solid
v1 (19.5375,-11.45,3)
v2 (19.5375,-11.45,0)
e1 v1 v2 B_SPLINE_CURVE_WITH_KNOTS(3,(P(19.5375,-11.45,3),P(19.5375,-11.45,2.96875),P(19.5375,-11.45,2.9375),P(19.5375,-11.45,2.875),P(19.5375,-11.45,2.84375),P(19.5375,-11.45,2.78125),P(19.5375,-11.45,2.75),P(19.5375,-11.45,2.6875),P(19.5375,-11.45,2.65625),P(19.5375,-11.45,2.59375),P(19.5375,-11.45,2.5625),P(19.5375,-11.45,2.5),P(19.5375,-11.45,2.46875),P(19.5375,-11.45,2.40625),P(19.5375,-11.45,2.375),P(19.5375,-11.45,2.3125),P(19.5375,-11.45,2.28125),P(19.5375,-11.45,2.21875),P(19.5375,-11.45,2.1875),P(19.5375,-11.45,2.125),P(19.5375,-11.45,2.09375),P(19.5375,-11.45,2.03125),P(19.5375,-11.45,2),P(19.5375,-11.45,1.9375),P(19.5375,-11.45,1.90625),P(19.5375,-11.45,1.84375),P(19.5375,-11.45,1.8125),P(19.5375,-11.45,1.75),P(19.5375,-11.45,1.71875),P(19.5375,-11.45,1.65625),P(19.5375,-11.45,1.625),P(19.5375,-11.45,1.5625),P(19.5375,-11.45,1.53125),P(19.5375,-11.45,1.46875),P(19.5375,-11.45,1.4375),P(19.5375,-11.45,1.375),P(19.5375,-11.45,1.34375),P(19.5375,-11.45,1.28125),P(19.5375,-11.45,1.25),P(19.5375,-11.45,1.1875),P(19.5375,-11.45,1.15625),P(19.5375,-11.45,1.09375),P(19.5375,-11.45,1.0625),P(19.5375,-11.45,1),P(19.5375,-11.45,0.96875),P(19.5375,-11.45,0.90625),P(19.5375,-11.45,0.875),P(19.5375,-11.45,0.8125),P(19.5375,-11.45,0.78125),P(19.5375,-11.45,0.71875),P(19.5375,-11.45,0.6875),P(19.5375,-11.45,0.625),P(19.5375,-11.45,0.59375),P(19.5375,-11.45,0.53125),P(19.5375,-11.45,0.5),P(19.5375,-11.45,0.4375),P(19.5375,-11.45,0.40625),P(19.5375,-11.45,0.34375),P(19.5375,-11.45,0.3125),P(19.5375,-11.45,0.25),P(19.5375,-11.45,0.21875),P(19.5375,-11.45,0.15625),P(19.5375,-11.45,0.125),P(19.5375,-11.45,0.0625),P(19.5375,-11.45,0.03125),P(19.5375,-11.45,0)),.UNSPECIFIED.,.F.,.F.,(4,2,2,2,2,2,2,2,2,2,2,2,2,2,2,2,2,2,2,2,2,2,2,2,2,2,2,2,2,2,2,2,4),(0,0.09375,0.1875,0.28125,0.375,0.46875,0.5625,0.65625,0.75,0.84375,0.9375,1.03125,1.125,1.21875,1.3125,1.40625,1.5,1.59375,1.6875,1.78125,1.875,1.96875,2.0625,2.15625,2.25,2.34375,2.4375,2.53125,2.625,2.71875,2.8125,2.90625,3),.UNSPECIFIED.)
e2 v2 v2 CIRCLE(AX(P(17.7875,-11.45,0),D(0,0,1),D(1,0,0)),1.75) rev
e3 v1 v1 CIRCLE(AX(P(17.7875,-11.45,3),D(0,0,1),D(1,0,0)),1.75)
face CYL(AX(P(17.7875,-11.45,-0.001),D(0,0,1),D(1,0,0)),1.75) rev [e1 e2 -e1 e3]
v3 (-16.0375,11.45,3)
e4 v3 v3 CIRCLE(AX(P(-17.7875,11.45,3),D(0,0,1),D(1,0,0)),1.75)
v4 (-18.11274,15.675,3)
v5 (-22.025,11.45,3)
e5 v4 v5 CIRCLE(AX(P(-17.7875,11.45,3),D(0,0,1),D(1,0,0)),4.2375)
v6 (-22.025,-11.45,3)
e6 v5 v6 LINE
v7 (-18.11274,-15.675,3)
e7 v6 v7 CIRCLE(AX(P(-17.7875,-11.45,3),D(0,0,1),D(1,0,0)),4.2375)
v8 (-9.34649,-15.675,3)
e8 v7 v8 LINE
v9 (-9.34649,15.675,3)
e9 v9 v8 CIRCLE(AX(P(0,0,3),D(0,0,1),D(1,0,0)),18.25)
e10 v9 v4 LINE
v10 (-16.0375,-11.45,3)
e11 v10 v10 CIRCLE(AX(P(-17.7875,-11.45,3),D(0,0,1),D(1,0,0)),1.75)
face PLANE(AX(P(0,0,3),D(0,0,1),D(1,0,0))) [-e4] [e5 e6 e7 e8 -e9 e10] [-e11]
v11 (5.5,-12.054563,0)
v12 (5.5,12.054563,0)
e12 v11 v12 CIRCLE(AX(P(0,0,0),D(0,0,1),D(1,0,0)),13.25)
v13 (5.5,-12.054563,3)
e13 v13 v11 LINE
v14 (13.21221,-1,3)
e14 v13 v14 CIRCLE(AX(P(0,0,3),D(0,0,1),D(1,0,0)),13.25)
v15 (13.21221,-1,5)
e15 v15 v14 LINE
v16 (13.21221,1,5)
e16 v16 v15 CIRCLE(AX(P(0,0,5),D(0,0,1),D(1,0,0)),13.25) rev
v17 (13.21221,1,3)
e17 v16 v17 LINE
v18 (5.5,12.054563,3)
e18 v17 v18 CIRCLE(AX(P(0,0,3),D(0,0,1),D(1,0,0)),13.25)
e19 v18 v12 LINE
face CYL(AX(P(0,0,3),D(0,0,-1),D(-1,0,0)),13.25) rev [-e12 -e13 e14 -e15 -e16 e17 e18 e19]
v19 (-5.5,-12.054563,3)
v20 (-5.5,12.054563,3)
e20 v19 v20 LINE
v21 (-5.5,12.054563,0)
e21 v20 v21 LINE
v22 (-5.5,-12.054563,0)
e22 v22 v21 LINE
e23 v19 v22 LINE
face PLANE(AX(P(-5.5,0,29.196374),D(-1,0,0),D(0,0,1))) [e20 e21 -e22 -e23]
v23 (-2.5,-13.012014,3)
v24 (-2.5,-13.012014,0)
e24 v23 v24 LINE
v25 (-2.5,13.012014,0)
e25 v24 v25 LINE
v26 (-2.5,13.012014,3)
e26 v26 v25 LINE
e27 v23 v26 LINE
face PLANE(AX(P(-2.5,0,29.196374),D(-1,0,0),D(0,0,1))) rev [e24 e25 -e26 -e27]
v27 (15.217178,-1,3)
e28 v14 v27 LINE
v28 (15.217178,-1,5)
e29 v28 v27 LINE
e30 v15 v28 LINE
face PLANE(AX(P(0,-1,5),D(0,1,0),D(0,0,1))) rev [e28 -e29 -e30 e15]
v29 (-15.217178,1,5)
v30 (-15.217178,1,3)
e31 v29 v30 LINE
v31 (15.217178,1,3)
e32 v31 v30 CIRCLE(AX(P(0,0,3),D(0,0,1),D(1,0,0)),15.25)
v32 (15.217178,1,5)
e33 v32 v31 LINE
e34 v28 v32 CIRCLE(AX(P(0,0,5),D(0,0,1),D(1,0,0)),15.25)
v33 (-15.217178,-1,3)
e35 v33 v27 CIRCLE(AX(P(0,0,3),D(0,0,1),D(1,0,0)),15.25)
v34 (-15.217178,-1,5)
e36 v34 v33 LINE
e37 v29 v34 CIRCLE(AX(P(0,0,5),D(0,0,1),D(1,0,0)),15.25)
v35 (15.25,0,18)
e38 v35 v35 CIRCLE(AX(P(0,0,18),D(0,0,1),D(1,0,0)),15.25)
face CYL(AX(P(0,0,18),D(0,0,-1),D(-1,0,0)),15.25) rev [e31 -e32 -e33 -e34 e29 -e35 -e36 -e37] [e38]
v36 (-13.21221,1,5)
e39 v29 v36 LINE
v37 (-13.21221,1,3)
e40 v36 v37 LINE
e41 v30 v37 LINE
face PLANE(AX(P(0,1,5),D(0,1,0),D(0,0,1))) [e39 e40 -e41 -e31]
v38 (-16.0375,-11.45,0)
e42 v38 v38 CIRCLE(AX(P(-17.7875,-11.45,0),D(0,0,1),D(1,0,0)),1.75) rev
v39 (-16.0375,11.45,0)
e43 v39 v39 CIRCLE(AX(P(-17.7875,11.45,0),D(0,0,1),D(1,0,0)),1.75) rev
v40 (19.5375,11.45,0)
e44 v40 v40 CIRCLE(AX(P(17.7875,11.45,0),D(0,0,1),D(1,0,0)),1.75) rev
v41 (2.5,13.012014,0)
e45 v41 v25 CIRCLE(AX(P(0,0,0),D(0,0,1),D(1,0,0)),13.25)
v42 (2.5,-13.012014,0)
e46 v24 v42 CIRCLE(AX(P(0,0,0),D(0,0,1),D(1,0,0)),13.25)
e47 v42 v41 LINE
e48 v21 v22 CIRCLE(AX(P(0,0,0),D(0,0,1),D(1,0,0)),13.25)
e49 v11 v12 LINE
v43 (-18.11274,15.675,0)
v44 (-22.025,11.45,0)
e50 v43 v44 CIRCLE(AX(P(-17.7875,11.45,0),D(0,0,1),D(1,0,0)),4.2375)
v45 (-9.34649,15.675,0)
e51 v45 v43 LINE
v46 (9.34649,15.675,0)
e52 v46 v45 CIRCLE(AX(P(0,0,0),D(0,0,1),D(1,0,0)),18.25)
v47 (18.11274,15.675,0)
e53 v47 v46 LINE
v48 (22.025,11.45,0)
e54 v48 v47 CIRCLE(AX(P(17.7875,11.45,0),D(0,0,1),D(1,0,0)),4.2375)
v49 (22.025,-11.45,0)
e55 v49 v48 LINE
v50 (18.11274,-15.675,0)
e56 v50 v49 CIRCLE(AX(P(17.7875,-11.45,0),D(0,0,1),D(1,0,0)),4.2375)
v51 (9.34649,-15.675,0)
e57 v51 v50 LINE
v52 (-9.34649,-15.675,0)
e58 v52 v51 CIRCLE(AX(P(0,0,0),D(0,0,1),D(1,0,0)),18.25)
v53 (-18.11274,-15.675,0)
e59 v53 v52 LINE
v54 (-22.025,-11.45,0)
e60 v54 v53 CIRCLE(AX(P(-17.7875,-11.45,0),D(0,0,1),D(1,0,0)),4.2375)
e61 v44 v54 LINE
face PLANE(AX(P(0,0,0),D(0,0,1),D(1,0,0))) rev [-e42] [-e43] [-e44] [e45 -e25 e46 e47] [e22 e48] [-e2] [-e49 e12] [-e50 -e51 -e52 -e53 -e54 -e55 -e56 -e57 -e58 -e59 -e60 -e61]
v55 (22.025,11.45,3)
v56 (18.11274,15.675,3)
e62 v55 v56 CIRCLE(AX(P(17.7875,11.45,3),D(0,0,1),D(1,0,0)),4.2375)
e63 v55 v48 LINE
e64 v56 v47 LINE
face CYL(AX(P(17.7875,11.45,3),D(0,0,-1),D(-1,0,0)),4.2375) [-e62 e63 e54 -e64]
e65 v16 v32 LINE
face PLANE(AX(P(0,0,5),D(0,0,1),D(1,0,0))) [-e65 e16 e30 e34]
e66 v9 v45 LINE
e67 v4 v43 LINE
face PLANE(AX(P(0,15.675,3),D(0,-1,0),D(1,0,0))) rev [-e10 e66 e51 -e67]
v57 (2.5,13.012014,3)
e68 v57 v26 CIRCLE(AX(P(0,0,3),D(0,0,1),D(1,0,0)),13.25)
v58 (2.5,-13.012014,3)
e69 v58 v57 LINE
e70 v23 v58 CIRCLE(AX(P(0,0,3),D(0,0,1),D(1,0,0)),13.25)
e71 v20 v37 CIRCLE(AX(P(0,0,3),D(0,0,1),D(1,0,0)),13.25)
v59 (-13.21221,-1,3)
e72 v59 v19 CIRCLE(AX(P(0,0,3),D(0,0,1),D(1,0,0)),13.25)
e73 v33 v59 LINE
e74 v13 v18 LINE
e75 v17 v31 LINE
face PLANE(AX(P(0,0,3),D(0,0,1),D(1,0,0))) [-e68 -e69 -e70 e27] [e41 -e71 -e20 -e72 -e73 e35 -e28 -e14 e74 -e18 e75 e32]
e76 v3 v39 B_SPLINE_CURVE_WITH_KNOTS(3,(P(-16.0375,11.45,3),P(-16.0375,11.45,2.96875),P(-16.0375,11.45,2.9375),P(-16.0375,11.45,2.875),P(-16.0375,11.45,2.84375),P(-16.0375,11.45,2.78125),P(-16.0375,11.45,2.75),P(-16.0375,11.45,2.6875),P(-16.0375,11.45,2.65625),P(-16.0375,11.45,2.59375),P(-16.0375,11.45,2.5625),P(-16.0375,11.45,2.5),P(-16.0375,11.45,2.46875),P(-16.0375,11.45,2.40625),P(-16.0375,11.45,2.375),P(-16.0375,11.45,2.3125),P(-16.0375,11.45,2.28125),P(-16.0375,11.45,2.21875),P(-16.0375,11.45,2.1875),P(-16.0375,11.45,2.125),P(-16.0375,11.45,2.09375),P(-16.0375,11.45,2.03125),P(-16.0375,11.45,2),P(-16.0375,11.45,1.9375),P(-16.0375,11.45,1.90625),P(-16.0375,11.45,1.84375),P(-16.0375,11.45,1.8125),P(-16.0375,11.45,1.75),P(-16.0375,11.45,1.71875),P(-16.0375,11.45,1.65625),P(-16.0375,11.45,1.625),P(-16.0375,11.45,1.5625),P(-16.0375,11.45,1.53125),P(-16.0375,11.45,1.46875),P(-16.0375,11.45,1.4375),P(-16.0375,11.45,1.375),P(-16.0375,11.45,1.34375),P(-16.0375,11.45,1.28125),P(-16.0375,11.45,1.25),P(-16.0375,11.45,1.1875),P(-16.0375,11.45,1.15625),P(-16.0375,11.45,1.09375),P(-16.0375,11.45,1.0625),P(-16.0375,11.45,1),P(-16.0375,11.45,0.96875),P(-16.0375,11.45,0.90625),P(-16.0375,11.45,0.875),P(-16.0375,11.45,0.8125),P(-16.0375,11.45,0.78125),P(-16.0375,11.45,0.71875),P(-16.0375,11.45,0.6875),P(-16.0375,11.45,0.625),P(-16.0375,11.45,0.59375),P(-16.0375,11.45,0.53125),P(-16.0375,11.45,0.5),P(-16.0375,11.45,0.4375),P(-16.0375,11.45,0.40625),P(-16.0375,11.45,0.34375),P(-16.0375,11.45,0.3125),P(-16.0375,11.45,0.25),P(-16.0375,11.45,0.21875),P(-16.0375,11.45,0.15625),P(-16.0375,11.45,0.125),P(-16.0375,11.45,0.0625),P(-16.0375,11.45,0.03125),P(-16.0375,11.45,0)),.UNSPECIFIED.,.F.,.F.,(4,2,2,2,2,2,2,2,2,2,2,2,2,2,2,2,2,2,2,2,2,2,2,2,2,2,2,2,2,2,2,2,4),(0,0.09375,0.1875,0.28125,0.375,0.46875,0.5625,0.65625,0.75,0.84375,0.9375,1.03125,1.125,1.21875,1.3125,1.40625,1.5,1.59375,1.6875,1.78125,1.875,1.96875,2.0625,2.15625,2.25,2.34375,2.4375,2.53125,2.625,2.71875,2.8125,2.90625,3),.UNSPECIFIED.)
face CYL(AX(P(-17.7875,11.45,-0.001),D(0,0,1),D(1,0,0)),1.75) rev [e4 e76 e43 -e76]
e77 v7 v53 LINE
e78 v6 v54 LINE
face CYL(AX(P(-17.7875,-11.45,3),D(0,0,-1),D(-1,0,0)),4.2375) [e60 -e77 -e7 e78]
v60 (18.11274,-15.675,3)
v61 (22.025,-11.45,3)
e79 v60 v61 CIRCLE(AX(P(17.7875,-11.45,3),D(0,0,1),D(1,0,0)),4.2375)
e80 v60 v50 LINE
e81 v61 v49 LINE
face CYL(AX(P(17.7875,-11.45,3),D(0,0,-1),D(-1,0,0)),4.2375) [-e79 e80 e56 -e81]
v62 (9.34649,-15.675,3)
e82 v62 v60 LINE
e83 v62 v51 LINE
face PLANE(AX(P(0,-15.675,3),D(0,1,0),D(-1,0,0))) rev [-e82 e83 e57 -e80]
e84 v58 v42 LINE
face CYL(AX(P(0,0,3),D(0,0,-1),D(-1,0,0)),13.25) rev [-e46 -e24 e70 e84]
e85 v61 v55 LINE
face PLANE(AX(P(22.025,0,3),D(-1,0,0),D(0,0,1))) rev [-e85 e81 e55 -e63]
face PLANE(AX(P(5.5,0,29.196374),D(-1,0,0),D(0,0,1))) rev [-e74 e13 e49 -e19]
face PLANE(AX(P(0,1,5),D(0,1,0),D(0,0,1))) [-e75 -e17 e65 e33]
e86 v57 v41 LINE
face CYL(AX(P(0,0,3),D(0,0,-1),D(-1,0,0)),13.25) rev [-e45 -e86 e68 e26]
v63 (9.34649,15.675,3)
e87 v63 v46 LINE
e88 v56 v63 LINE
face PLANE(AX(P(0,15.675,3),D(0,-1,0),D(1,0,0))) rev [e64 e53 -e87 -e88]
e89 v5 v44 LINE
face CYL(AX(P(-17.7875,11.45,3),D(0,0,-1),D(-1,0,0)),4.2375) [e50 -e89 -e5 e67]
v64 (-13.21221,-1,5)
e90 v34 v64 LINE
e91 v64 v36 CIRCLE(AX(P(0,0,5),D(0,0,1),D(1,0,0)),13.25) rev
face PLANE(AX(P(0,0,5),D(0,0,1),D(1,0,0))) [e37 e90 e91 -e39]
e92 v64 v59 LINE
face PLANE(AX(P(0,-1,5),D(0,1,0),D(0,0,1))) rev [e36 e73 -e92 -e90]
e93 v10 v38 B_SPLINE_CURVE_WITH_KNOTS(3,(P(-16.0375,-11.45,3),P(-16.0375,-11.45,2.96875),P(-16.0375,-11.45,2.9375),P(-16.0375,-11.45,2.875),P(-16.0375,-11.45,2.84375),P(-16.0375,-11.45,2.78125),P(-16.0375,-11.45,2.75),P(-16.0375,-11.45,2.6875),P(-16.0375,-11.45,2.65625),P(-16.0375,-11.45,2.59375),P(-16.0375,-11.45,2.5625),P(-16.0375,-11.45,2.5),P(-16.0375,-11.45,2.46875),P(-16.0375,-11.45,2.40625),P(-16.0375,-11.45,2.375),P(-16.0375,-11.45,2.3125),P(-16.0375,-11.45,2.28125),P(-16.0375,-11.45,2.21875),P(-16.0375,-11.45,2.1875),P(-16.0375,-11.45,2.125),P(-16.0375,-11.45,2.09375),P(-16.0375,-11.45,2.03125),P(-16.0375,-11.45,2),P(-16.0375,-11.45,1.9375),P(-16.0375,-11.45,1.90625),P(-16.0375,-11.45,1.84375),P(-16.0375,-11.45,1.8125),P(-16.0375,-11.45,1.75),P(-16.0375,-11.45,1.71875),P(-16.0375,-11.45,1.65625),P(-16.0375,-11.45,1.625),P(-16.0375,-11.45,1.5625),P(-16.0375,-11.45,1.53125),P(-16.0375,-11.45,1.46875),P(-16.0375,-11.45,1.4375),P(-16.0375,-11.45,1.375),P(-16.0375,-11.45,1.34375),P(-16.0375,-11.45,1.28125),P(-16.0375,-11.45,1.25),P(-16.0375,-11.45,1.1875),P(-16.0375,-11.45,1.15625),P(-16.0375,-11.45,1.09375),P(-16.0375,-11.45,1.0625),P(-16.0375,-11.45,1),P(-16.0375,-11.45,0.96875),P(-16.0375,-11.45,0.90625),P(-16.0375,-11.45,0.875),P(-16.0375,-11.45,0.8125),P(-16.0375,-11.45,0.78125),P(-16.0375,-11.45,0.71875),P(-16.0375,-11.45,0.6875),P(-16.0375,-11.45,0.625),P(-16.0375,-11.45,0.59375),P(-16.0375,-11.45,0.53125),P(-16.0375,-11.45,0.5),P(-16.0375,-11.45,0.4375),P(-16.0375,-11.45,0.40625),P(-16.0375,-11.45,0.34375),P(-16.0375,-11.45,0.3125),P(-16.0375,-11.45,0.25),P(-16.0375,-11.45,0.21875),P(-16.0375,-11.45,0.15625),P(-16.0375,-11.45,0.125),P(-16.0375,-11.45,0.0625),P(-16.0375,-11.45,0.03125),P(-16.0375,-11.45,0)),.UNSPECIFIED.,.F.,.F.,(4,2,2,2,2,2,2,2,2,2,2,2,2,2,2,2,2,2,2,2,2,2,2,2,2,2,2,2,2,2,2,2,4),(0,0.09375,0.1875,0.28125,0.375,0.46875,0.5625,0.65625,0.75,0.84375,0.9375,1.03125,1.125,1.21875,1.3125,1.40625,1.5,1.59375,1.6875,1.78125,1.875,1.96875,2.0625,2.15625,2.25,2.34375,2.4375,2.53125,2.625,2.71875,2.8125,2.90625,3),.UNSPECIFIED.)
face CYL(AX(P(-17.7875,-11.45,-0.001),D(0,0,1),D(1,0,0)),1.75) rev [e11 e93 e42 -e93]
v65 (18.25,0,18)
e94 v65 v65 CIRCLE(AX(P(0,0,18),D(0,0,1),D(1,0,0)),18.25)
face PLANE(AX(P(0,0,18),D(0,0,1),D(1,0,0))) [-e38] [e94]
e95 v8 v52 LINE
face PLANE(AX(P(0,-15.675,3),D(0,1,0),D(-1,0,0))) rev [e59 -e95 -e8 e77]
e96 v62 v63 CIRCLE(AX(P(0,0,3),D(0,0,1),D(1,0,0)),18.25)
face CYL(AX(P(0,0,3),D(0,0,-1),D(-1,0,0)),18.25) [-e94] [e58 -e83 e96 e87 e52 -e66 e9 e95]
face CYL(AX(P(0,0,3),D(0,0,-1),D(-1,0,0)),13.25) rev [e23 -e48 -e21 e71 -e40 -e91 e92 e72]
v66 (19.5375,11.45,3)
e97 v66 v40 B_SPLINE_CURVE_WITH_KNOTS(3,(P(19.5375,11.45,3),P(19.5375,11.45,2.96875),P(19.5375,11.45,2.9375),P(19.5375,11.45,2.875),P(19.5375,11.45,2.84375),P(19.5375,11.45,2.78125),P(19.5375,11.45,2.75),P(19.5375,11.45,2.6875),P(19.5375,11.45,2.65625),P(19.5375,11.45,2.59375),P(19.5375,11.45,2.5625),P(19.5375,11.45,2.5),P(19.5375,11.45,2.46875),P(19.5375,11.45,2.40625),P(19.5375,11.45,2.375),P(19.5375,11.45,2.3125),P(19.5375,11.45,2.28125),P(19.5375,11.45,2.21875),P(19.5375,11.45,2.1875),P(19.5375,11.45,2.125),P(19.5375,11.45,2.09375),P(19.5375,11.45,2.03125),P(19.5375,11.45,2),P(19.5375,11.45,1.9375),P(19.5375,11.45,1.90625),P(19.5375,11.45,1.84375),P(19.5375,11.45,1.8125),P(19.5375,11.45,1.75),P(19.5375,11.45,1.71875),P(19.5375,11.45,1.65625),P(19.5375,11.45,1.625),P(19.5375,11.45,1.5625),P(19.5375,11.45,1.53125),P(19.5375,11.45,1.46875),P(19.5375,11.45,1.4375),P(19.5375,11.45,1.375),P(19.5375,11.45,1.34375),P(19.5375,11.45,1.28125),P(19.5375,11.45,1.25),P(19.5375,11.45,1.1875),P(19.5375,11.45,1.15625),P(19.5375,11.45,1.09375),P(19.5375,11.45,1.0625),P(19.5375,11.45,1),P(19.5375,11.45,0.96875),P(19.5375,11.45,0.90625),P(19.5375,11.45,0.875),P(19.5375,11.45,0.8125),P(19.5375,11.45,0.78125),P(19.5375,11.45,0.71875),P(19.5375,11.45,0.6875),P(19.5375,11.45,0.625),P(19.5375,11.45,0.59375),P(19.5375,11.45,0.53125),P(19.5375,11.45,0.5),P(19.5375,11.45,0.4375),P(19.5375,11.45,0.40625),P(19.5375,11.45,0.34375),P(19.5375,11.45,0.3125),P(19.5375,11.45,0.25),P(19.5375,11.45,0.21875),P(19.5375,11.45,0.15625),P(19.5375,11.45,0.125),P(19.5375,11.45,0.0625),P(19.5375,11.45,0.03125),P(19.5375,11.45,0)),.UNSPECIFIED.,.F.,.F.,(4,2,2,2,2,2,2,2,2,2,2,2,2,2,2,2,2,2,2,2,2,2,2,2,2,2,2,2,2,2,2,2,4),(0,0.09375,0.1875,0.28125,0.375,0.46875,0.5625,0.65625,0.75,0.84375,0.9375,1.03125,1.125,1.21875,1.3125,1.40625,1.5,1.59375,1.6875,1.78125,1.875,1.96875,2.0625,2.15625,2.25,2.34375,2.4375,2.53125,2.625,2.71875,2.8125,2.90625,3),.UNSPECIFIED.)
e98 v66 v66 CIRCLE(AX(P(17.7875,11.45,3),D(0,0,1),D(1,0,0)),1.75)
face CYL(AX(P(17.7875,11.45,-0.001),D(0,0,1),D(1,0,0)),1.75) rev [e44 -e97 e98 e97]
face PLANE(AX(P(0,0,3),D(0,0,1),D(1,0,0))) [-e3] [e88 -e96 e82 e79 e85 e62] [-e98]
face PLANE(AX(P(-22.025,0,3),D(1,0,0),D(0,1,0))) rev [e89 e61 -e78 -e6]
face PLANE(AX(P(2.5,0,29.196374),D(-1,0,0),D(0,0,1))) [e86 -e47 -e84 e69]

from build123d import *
from build123d.topology import SkipClean

# Parameters (mm, degrees)
SKETCH1_R                = 1.4
SKETCH1_R_2              = 13.25
BOSS_EXTRUDE1_DEPTH      = 3
SKETCH3_R                = 18.25
SKETCH3_R_2              = 15.25
BOSS_EXTRUDE2_DEPTH      = 15
BOSS_EXTRUDE4_DEPTH      = 2
BOSS_EXTRUDE5_DEPTH      = 3
CUT_EXTRUDE1_START       = -3
CUT_EXTRUDE1_OUTLINE_R   = 1.75
CUT_EXTRUDE1_OUTLINE_R_2 = 1.4
CUT_EXTRUDE1_DEPTH       = 3


# Read off the part's stored shape, not the designer's step: Cut-Extrude1
with BuildPart() as part:
    # Sketch1 → Boss-Extrude1 (new body)
    with BuildSketch(Plane.XY):
        with BuildLine():
            ThreePointArc((22.025, 11.45), (20.896729165, 14.329079757), (18.112740296, 15.675))
            Line((18.112740296, 15.675), (9.346489983, 15.675))
            ThreePointArc((9.346489983, 15.675), (0, 18.25), (-9.346489983, 15.675))
            Line((-9.346489983, 15.675), (-18.112740296, 15.675))
            ThreePointArc((-18.112740296, 15.675), (-20.896729165, 14.329079757), (-22.025, 11.45))
            Line((-22.025, 11.45), (-22.025, -11.45))
            ThreePointArc((-22.025, -11.45), (-20.896729165, -14.329079757), (-18.112740296, -15.675))
            Line((-18.112740296, -15.675), (-9.346489983, -15.675))
            ThreePointArc((-9.346489983, -15.675), (0, -18.25), (9.346489983, -15.675))
            Line((9.346489983, -15.675), (18.112740296, -15.675))
            ThreePointArc((18.112740296, -15.675), (20.896729165, -14.329079757), (22.025, -11.45))
            Line((22.025, -11.45), (22.025, 11.45))
        make_face()
        with Locations((17.7875, -11.45)):
            Circle(SKETCH1_R, mode=Mode.SUBTRACT)
        with Locations((17.7875, 11.45)):
            Circle(SKETCH1_R, mode=Mode.SUBTRACT)
        with Locations((-17.7875, 11.45)):
            Circle(SKETCH1_R, mode=Mode.SUBTRACT)
        with Locations((-17.7875, -11.45)):
            Circle(SKETCH1_R, mode=Mode.SUBTRACT)
        Circle(SKETCH1_R_2, mode=Mode.SUBTRACT)
    extrude(amount=BOSS_EXTRUDE1_DEPTH)

    # Sketch3 → Boss-Extrude2 (add)
    with BuildSketch(Plane.XY.offset(3)):
        with Locations(Location((0, 0, 0), (0, 0, 120.806241835))):
            Circle(SKETCH3_R)
        Circle(SKETCH3_R_2, mode=Mode.SUBTRACT)
    extrude(amount=BOSS_EXTRUDE2_DEPTH)

    # Sketch5 → Boss-Extrude4 (add)
    with SkipClean():  # the faces are left unmerged after this step: merging them gives an invalid solid
        with BuildSketch(Plane.XY.offset(3)):
            with BuildLine():
                ThreePointArc((-15.25, -5.3e-08), (-15.241792239, -0.500269278), (-15.217177794, -1))
                Line((-15.217177794, -1), (-13.212210262, -1))
                ThreePointArc((-13.212210262, -1), (-13.25, 0), (-13.212210262, 1))
                Line((-13.212210262, 1), (-15.217177794, 1))
                ThreePointArc((-15.217177794, 1), (-15.24179224, 0.500269225), (-15.25, -5.3e-08))
            make_face()
            with BuildLine():
                Line((13.212210262, -1), (15.217177794, -1))
                ThreePointArc((15.217177794, -1), (15.24179224, -0.500269252), (15.25, 0))
                ThreePointArc((15.25, 0), (15.24179224, 0.500269252), (15.217177794, 1))
                Line((15.217177794, 1), (13.212210262, 1))
                ThreePointArc((13.212210262, 1), (13.240549195, 0.500356889), (13.25, 0))
                ThreePointArc((13.25, 0), (13.240549195, -0.500356889), (13.212210262, -1))
            make_face()
        extrude(amount=BOSS_EXTRUDE4_DEPTH)

    # Sketch6 → Boss-Extrude5 (add)
    with SkipClean():  # the faces are left unmerged after this step: merging them gives an invalid solid
        with BuildSketch(Plane(origin=(0, 0, 0), x_dir=(-1, 0, 0), z_dir=(0, 0, -1))):
            with BuildLine():
                ThreePointArc((-5.5, -12.054563451), (-4.028545362, -12.622730381), (-2.5, -13.01201368))
                Line((-2.5, -13.01201368), (-2.5, 13.01201368))
                ThreePointArc((-2.5, 13.01201368), (-4.028545362, 12.622730381), (-5.5, 12.054563451))
                Line((-5.5, 12.054563451), (-5.5, -12.054563451))
            make_face()
            with BuildLine():
                Line((2.5, 13.01201368), (2.5, -13.01201368))
                ThreePointArc((2.5, -13.01201368), (4.028545362, -12.622730381), (5.5, -12.054563451))
                Line((5.5, -12.054563451), (5.5, 12.054563451))
                ThreePointArc((5.5, 12.054563451), (4.028545362, 12.622730381), (2.5, 13.01201368))
            make_face()
        extrude(amount=-BOSS_EXTRUDE5_DEPTH)

    # Cut-Extrude1 outline → Cut-Extrude1 (cut)
    # profile 1 of 4: a face of its own
    with SkipClean():  # the faces are left unmerged after this step: merging them gives an invalid solid
        with BuildSketch(Plane.XY.offset(3).offset(CUT_EXTRUDE1_START)):
            with Locations((-17.7875, 11.45)):
                Circle(CUT_EXTRUDE1_OUTLINE_R)
            with Locations((-17.7875, 11.45)):
                Circle(CUT_EXTRUDE1_OUTLINE_R_2, mode=Mode.SUBTRACT)
        # profile 2 of 4: a face of its own
        with BuildSketch(Plane.XY.offset(3).offset(CUT_EXTRUDE1_START)):
            with Locations((-17.7875, -11.45)):
                Circle(CUT_EXTRUDE1_OUTLINE_R)
            with Locations((-17.7875, -11.45)):
                Circle(CUT_EXTRUDE1_OUTLINE_R_2, mode=Mode.SUBTRACT)
        # profile 3 of 4: a face of its own
        with BuildSketch(Plane.XY.offset(3).offset(CUT_EXTRUDE1_START)):
            with Locations((17.7875, -11.45)):
                Circle(CUT_EXTRUDE1_OUTLINE_R)
            with Locations((17.7875, -11.45)):
                Circle(CUT_EXTRUDE1_OUTLINE_R_2, mode=Mode.SUBTRACT)
        # profile 4 of 4: a face of its own
        with BuildSketch(Plane.XY.offset(3).offset(CUT_EXTRUDE1_START)):
            with Locations((17.7875, 11.45)):
                Circle(CUT_EXTRUDE1_OUTLINE_R)
            with Locations((17.7875, 11.45)):
                Circle(CUT_EXTRUDE1_OUTLINE_R_2, mode=Mode.SUBTRACT)
        extrude(amount=CUT_EXTRUDE1_DEPTH, mode=Mode.SUBTRACT)


solid = part.part
